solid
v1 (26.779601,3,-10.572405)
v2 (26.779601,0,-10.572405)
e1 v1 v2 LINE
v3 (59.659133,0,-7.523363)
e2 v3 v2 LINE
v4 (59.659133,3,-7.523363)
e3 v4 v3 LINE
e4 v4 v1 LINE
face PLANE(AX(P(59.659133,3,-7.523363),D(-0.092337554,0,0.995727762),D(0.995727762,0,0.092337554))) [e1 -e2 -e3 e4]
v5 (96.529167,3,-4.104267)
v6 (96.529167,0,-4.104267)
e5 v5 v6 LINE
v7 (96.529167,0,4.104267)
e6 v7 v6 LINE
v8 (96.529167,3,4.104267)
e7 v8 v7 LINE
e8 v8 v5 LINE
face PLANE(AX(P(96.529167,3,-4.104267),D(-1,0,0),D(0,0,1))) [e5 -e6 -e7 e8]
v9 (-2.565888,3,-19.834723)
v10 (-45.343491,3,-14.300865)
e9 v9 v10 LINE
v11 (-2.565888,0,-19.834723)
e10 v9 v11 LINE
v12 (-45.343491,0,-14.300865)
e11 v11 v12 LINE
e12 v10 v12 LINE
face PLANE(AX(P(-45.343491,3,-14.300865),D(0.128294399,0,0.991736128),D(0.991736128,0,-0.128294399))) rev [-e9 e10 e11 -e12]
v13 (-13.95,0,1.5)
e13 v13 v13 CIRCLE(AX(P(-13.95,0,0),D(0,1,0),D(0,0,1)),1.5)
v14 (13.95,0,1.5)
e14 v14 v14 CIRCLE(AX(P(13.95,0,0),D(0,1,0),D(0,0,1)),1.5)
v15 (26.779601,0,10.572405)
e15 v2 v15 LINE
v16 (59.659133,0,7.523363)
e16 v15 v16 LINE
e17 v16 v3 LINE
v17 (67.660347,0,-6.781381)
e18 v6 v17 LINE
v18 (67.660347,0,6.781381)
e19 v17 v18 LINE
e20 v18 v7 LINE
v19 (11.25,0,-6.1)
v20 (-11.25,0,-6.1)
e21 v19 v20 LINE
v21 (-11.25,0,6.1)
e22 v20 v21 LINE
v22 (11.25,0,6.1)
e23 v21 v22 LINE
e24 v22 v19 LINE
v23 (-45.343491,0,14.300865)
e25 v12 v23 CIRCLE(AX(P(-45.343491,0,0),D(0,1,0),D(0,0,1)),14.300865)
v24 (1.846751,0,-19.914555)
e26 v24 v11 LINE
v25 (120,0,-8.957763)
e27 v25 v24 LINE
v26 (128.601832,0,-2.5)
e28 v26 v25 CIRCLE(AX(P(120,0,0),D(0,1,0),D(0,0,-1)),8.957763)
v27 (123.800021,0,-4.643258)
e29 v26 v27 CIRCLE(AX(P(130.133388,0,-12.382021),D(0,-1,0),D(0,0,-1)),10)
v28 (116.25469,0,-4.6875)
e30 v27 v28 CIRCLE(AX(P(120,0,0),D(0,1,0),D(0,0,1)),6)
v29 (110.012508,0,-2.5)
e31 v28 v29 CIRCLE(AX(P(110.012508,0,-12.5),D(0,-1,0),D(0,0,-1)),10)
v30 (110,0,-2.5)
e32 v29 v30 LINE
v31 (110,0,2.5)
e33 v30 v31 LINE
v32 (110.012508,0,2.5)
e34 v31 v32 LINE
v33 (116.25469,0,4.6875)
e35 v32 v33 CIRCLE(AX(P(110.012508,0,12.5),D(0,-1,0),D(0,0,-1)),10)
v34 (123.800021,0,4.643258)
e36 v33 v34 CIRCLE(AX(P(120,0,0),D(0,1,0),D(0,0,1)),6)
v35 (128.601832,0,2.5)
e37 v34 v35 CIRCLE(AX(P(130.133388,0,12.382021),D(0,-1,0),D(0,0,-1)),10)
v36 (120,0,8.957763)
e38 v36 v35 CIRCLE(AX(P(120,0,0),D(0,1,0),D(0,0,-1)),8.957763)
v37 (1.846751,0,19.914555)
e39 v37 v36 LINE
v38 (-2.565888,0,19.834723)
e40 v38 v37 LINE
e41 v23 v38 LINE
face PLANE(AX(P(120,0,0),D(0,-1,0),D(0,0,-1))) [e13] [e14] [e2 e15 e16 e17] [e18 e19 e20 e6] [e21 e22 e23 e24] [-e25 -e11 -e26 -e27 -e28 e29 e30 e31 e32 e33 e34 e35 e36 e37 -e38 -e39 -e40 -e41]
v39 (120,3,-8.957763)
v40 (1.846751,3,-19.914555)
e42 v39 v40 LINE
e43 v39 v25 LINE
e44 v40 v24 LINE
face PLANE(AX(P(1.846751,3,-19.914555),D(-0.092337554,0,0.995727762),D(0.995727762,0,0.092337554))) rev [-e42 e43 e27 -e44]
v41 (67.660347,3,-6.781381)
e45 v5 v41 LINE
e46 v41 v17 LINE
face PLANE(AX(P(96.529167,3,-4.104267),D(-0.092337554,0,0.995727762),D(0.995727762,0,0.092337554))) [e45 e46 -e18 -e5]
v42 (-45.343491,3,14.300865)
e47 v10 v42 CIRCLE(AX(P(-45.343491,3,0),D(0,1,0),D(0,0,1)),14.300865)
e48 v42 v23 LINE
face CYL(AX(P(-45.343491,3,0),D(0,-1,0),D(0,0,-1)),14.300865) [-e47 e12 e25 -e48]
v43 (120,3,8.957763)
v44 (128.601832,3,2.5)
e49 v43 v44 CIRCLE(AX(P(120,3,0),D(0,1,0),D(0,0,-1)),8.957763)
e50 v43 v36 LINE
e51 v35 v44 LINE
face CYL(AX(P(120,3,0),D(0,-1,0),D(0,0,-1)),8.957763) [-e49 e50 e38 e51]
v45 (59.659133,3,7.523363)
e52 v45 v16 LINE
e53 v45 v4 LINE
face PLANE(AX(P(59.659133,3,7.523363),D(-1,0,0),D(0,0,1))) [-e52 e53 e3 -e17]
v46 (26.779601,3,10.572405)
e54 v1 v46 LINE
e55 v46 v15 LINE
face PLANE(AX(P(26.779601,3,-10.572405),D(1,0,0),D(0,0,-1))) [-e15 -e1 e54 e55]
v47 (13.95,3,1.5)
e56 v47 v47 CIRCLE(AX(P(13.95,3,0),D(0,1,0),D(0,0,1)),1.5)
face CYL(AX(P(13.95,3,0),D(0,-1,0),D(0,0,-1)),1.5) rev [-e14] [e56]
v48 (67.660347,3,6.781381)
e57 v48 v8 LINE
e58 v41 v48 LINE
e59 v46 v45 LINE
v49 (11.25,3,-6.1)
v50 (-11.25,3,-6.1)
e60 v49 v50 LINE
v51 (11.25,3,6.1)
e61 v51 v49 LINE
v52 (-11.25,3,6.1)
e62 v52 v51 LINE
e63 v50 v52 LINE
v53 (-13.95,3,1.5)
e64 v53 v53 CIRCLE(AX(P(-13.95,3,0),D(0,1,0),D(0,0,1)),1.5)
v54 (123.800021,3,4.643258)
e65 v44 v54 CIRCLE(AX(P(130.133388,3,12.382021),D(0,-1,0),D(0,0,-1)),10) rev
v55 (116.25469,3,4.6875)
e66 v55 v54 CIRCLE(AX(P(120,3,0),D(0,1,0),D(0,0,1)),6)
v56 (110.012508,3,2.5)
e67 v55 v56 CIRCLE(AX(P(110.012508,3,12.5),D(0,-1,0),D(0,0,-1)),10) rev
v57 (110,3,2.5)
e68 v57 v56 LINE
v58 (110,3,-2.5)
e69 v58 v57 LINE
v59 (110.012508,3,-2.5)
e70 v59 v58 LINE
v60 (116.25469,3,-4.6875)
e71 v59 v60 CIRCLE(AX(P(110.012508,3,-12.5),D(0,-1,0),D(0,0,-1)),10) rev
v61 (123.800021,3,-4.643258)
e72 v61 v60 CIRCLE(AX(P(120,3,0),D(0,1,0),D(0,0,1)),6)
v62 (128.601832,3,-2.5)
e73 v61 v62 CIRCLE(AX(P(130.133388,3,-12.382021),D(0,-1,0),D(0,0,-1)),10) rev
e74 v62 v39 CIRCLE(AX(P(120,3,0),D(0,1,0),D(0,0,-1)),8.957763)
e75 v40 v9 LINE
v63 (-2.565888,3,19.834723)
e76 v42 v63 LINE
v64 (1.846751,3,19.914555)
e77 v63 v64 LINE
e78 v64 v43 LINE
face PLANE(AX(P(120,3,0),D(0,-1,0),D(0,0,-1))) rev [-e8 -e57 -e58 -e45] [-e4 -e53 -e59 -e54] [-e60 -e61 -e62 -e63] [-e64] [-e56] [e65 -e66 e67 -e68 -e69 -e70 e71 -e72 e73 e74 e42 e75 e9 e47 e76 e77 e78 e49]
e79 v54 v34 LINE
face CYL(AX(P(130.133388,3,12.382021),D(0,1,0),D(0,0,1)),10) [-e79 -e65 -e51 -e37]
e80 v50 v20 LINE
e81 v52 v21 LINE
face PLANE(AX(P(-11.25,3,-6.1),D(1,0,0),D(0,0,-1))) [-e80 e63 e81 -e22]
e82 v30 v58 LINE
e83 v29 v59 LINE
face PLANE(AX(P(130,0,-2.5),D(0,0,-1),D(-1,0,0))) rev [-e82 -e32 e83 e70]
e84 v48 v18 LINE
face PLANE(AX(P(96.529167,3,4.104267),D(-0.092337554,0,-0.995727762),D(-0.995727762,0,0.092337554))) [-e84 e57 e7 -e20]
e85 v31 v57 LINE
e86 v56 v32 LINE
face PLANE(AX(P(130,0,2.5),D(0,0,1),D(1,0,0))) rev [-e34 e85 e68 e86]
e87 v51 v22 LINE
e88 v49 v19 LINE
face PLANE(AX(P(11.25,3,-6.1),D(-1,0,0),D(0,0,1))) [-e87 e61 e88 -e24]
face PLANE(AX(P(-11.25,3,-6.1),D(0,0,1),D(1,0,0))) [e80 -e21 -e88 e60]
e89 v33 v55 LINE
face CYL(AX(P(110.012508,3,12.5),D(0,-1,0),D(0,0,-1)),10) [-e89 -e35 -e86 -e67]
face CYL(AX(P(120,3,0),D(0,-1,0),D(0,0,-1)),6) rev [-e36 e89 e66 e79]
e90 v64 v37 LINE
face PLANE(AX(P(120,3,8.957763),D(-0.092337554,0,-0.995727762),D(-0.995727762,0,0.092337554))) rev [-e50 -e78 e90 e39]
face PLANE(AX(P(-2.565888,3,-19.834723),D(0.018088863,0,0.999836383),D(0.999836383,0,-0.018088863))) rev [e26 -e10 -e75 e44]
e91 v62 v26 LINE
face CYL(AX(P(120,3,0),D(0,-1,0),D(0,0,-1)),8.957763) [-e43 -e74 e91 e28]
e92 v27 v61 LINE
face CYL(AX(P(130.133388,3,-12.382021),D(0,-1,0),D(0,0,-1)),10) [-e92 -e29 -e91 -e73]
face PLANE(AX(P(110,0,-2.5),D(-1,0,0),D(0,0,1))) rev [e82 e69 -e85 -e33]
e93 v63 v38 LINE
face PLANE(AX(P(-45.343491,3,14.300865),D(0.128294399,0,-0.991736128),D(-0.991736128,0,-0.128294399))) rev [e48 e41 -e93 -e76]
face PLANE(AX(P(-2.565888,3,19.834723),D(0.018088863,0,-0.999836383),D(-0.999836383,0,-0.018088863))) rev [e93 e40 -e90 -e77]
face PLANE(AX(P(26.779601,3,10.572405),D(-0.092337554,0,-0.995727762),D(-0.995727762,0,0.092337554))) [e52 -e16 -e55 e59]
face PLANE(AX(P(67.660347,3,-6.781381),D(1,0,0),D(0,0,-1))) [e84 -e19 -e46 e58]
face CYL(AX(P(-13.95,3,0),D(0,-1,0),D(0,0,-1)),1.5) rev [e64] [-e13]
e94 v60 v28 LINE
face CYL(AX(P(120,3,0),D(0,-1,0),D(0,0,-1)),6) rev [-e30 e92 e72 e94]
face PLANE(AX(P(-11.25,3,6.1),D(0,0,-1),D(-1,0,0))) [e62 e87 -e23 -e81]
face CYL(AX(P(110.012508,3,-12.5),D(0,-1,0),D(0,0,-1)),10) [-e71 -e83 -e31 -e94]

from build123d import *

# Parameters (mm, degrees)
SKETCH1_R           = 1.5
SKETCH1_R_2         = 6
SKETCH1_W           = 22.5
SKETCH1_H           = 12.2
BOSS_EXTRUDE1_DEPTH = 3
SKETCH3_W           = 20
SKETCH3_H           = 5
CUT_EXTRUDE1_DEPTH  = 131.520857309
FILLET1_R           = 10


with BuildPart() as part:
    # Sketch1 → Boss-Extrude1 (new body)
    with BuildSketch(Plane(origin=(0, 0, 0), x_dir=(1, 0, 0), z_dir=(0, 1, 0))):
        with BuildLine():
            Line((1.846751087, 19.91455524), (120, 8.957763171))
            ThreePointArc((120, 8.957763171), (128.957763171, 0), (120, -8.957763171))
            Line((120, -8.957763171), (1.846751087, -19.91455524))
            Line((1.846751087, -19.91455524), (-2.565887989, -19.834722555))
            Line((-2.565887989, -19.834722555), (-45.343490518, -14.300864634))
            ThreePointArc((-45.343490518, -14.300864634), (-59.644355152, 0), (-45.343490518, 14.300864634))
            Line((-45.343490518, 14.300864634), (-2.565887989, 19.834722555))
            Line((-2.565887989, 19.834722555), (1.846751087, 19.91455524))
        make_face()
        with Locations(Location((13.95, 0, 0), (0, 0, 270))):
            Circle(SKETCH1_R, mode=Mode.SUBTRACT)
        with Locations(Location((-13.95, 0, 0), (0, 0, 270))):
            Circle(SKETCH1_R, mode=Mode.SUBTRACT)
        with Locations(Location((120, 0, 0), (0, 0, 270))):
            Circle(SKETCH1_R_2, mode=Mode.SUBTRACT)
        Rectangle(SKETCH1_W, SKETCH1_H, mode=Mode.SUBTRACT)
        Polygon((96.529167285, 4.104267173), (67.660347399, 6.781380665), (67.660347399, -6.781380665), (96.529167285, -4.104267173), align=None, mode=Mode.SUBTRACT)
        Polygon((59.65913304, 7.523363157), (26.779600723, 10.572404992), (26.779600723, -10.572404992), (59.65913304, -7.523363157), align=None, mode=Mode.SUBTRACT)
    extrude(amount=BOSS_EXTRUDE1_DEPTH)

    # Sketch3 → Cut-Extrude1 (cut, through all)
    with BuildSketch(Plane(origin=(0, 3, 0), x_dir=(1, 0, 0), z_dir=(0, 1, 0))):
        with Locations((120, 0)):
            Rectangle(SKETCH3_W, SKETCH3_H)
    extrude(amount=-CUT_EXTRUDE1_DEPTH, mode=Mode.SUBTRACT)

    # Fillet1
    # the kernel refuses this fillet: 10 mm, written as the material it takes off along each edge
    with BuildSketch(Plane(origin=(125.454356057, 10.868690914, 2.5), x_dir=(1, 0, 0), z_dir=(0, -1, 0))) as fillet1_piece_1:
        with BuildLine():
            CenterArc((4.679032278, 9.882020871), FILLET1_R, 230.703265247, 30.48689252)
            Line((-1.654335431, 2.143257826), (-1.781002786, 1.988482566))
            ThreePointArc((-1.781002786, 1.988482566), (-0.863019038, 1.043956035), (-0.181811869, -0.083333333))
            Line((-0.181811869, -0.083333333), (0, -0.2))
            ThreePointArc((0, -0.2), (1.573738183, -0.2), (3.116845247, -0.197640417))
            Line((3.116845247, -0.197640417), (3.147476366, 0))
        make_face()
    extrude(amount=18.737381828, mode=Mode.SUBTRACT)
    with BuildSketch(Plane(origin=(114.545643943, 14.332840301, 2.5), x_dir=(0.6156579371182371, 0, 0.7880135179445317), z_dir=(0, -1, 0))) as fillet1_piece_2:
        with BuildLine():
            CenterArc((5.089273947, 9.728751913), FILLET1_R, 217.99974274, 38.624832873)
            Line((-2.790861233, 3.572172542), (-2.948463936, 3.449040954))
            Line((-2.948463936, 3.449040954), (-0.157602704, -0.123131587))
            Line((-0.157602704, -0.123131587), (0.046266127, -0.194575038))
            ThreePointArc((0.046266127, -0.194575038), (1.387983804, -0.037251148), (2.729701481, -0.194575038))
            Line((2.729701481, -0.194575038), (2.775967607, 0))
        make_face()
    extrude(amount=25.665680602, mode=Mode.SUBTRACT)
    with BuildSketch(Plane(origin=(114.545643943, 14.332840301, -2.5), x_dir=(-1, 0, 0), z_dir=(0, -1, 0))) as fillet1_piece_3:
        with BuildLine():
            CenterArc((4.53313612, 10), FILLET1_R, 231.375167127, 38.624832873)
            Line((-1.709046491, 2.1875), (-1.833890143, 2.03125))
            ThreePointArc((-1.833890143, 2.03125), (-0.883877653, 1.070816035), (-0.181811869, -0.083333333))
            Line((-0.181811869, -0.083333333), (0, -0.2))
            Line((0, -0.2), (4.53313612, -0.2))
            Line((4.53313612, -0.2), (4.53313612, 0))
        make_face()
    extrude(amount=25.665680602, mode=Mode.SUBTRACT)
    with BuildSketch(Plane(origin=(125.454356057, 10.868690914, -2.5), x_dir=(-0.6110269025667731, 0, -0.7916098308760795), z_dir=(0, -1, 0))) as fillet1_piece_4:
        with BuildLine():
            CenterArc((4.96369027, 9.742148554), FILLET1_R, 226.473634032, 30.48689252)
            Line((-1.923192735, 2.491573233), (-2.060930395, 2.346561727))
            ThreePointArc((-2.060930395, 2.346561727), (-1.119918333, 1.123581236), (-0.158321966, -0.122205381))
            Line((-0.158321966, -0.122205381), (0.045124457, -0.194842971))
            ThreePointArc((0.045124457, -0.194842971), (1.35373371, -0.045289132), (2.662342963, -0.194842971))
            Line((2.662342963, -0.194842971), (2.70746742, 0))
        make_face()
    extrude(amount=18.737381828, mode=Mode.SUBTRACT)


solid = part.part
